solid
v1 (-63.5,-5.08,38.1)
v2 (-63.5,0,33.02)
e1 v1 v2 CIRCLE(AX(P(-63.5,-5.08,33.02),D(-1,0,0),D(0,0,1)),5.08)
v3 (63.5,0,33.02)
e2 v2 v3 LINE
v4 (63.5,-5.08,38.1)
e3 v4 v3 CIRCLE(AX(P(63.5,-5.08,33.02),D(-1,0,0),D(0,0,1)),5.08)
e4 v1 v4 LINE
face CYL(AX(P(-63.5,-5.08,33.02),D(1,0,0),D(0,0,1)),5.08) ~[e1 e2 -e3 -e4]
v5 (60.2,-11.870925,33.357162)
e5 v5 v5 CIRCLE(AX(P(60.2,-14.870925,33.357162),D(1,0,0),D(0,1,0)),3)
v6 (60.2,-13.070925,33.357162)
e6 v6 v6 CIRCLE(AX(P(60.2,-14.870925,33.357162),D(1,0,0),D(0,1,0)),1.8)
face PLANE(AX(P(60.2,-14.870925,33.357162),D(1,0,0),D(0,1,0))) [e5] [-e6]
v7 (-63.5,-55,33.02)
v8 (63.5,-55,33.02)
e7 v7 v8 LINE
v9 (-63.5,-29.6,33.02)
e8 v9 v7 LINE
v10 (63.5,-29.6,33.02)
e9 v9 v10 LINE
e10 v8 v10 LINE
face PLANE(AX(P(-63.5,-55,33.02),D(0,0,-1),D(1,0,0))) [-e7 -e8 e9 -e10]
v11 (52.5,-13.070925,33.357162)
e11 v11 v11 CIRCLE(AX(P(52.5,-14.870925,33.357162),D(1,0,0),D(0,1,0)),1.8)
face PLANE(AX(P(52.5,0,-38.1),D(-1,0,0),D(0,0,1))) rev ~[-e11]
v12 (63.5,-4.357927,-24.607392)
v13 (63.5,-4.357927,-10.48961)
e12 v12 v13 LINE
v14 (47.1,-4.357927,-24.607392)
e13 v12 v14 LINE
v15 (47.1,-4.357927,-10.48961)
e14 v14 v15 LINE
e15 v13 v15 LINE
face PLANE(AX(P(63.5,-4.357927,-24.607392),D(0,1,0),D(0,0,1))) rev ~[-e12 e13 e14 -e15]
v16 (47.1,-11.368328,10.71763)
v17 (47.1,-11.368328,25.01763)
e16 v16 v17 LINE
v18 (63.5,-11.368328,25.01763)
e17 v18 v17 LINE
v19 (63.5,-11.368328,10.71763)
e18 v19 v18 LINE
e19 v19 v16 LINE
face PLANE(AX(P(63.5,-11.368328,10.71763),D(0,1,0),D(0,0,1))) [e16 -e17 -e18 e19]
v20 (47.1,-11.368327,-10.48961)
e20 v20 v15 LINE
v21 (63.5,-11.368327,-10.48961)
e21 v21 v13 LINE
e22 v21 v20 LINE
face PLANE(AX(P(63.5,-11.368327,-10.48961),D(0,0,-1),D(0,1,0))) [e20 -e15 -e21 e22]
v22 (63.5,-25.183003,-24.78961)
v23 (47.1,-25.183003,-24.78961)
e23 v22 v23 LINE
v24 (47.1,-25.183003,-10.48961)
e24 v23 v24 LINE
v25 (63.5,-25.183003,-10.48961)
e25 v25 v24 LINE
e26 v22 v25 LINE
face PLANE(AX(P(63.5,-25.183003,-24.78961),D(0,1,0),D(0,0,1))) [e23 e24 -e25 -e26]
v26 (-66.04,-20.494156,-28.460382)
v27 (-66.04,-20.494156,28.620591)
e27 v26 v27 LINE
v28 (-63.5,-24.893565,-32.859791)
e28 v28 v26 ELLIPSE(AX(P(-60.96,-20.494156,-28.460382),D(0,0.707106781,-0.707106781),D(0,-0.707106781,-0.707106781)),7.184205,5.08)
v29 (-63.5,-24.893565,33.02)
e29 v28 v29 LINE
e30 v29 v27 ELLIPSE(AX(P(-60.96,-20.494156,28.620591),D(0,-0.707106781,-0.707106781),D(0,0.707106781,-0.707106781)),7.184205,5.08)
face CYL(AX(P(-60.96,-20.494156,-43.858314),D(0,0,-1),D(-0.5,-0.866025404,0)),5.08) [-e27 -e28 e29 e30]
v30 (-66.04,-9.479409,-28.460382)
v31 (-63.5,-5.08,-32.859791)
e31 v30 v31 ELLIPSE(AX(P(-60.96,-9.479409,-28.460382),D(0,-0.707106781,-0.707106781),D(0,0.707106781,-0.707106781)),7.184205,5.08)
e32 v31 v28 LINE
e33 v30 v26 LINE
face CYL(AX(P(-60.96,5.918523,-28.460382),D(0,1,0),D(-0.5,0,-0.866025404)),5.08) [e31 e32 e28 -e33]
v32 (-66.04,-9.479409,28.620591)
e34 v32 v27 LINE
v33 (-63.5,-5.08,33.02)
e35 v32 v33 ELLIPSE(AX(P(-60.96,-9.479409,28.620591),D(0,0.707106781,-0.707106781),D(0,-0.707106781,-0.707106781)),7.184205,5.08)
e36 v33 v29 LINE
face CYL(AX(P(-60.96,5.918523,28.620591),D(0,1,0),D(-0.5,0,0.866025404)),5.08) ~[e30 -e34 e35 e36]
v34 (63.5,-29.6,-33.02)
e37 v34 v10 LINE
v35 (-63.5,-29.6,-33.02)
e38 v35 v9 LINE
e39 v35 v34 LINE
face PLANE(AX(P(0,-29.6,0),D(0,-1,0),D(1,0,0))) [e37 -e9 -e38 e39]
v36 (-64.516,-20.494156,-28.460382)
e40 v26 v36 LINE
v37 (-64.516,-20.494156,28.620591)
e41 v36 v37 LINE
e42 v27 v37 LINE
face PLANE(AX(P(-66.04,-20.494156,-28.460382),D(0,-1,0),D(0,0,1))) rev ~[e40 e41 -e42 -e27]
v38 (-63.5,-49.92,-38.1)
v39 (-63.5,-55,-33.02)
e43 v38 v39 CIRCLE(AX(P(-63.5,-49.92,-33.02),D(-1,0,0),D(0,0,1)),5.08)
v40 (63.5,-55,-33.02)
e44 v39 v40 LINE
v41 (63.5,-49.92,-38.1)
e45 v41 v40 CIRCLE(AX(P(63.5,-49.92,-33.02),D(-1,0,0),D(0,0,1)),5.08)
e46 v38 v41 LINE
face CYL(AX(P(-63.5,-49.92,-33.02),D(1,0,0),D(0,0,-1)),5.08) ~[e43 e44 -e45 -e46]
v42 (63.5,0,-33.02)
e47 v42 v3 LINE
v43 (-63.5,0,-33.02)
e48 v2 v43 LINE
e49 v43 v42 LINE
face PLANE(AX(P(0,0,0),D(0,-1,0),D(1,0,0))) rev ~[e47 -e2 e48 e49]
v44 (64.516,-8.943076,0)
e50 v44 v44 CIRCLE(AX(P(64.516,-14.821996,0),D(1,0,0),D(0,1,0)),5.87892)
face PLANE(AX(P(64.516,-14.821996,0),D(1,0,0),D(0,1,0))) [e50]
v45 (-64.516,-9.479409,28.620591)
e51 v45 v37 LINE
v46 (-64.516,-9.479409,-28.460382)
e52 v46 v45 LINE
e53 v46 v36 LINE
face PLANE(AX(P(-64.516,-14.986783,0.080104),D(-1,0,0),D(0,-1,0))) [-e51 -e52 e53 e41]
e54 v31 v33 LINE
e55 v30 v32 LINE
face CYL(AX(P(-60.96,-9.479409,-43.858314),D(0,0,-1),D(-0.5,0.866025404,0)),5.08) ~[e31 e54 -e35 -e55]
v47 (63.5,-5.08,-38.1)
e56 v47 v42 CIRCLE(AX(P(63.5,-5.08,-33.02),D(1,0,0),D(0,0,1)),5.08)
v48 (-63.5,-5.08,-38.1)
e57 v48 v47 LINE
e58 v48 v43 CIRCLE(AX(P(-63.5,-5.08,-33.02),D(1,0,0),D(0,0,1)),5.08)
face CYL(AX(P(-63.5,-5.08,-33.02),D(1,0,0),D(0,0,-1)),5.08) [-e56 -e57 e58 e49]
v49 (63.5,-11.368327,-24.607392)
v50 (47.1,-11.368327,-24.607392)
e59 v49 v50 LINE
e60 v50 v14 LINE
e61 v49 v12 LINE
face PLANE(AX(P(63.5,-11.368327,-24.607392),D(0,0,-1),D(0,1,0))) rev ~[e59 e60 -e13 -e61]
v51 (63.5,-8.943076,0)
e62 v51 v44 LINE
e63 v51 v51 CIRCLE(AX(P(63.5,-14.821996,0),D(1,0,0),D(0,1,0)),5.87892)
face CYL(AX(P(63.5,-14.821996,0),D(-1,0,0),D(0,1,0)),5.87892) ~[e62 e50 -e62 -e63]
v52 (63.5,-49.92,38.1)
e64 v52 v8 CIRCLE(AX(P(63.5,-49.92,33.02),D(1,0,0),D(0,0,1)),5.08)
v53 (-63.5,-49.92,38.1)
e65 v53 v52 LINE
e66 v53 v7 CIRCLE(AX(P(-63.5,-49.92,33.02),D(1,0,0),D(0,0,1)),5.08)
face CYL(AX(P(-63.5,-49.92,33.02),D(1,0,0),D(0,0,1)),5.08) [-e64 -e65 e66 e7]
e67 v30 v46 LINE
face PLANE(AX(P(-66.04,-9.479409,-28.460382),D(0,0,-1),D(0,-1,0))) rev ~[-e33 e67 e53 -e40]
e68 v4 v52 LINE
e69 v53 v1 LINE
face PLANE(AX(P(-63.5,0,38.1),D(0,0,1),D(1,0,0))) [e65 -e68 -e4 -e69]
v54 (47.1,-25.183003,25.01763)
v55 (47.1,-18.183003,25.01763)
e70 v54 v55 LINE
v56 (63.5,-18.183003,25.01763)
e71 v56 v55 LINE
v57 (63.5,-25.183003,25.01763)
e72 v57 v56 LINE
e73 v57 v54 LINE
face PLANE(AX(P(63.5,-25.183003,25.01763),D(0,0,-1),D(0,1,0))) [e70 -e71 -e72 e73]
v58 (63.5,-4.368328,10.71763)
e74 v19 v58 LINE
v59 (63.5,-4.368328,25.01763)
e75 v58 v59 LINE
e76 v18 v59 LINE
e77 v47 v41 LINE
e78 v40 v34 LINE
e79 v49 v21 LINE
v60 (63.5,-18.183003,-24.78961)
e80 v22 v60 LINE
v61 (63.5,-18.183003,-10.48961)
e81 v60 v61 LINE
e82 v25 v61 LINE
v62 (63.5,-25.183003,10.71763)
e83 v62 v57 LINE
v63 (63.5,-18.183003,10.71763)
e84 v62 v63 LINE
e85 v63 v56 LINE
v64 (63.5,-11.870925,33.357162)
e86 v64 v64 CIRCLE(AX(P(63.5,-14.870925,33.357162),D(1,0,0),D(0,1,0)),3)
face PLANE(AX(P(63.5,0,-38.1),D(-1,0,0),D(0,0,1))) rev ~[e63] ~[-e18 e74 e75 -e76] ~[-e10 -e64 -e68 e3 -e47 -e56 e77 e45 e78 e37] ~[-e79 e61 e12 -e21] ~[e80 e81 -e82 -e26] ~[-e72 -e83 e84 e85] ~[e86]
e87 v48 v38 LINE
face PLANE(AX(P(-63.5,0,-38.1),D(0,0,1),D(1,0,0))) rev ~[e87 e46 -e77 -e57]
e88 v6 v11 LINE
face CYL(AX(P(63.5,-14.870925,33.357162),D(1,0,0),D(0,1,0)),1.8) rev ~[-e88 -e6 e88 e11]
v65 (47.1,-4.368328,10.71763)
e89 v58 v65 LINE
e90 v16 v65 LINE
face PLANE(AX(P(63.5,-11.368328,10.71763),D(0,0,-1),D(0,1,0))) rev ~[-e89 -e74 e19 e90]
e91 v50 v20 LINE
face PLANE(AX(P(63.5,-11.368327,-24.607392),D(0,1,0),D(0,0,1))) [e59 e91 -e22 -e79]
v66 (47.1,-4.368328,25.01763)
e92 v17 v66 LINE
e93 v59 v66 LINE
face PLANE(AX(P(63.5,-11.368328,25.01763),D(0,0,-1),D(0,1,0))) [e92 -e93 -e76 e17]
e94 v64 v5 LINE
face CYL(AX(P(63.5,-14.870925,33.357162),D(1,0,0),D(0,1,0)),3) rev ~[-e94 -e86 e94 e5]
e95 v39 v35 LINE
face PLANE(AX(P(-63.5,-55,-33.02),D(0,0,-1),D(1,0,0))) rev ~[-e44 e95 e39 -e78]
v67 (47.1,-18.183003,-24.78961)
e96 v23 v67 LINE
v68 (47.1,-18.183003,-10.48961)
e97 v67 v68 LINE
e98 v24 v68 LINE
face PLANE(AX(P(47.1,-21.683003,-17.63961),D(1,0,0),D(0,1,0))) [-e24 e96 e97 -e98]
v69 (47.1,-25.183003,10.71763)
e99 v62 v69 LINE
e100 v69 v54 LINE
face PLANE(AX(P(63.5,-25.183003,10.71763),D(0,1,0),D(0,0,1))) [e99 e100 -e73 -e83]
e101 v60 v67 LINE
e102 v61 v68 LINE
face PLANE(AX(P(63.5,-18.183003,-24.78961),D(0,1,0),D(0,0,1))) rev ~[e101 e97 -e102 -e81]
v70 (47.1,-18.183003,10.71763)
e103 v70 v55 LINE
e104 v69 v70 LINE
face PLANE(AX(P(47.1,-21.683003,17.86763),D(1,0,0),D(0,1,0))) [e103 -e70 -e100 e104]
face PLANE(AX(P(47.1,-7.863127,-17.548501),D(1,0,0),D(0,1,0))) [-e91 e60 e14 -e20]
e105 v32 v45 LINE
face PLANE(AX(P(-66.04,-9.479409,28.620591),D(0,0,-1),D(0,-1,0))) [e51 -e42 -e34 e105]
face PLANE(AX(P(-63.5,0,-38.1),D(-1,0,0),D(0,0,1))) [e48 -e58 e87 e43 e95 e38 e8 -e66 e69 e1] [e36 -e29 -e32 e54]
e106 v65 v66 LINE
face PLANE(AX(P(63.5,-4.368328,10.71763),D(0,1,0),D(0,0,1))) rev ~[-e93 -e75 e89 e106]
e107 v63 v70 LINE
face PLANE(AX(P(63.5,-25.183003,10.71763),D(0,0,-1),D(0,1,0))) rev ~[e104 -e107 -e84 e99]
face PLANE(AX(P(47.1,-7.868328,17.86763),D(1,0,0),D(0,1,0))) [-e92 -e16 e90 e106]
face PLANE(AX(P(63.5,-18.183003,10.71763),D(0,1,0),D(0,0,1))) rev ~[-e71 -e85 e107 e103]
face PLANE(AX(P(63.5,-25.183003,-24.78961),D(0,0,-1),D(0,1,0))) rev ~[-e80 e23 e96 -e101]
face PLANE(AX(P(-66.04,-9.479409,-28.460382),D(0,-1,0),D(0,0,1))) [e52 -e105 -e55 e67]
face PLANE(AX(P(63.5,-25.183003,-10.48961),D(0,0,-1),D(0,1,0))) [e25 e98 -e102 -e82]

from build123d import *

# Parameters (mm, degrees)
F0_W         = 127
F0_H         = 76.2
F1_DEPTH     = 55
F2_R         = 5.08
F3_W         = 7
F3_H         = 14.3
F4_DEPTH     = 16.4
F5_DEPTH     = 25.4
F6_W         = 7
F6_H         = 14.3
F6_W_2       = 7.0104
F6_H_2       = 14.117781591
F7_DEPTH     = 16.4
F9_W         = 19.8135651034
F9_H         = 65.8797910702
F10_DEPTH    = 2.54
F11_T1_DEPTH = 87.8768363263
F11_T3_DEPTH = 41.8106103595
F12_DEPTH    = 1.524
F13_R        = 3
F13_R_2      = 1.8
F14_DEPTH    = 3.3
F15_DEPTH    = 11
F8_R         = 5.878920021
F16_DEPTH    = 1.016


# Not quite as in the source:
# - a fillet or chamfer that OpenCascade refuses, or shapes differently, is made with other operations: its cross-section is extruded or revolved along the edge and cut away or added


with BuildPart() as f1:
    # F0 (on Front) → F1 (new body)
    with BuildSketch(Plane.XZ):
        Rectangle(F0_W, F0_H)
    extrude(amount=F1_DEPTH)

    # F2
    f2_edges = [f1.edges().sort_by_distance(p)[0] for p in [
        (0, -55, -38.1),
        (0, 0, -38.1),
        (0, -55, 38.1),
        (0, 0, 38.1),
    ]]
    fillet(f2_edges, radius=F2_R)

    # F3 (on face) → F4 (cut)
    with BuildSketch(Plane.YZ.offset(63.5)):
        with Locations((-49.3123565018, 17.8676303864)):
            Rectangle(F3_W, F3_H)
        with Locations((-35.2098751962, 17.8676303864)):
            Rectangle(F3_W, F3_H)
        with Locations((-21.6830033958, 17.8676303864)):
            Rectangle(F3_W, F3_H)
        with Locations((-7.8683277741, 17.8676303864)):
            Rectangle(F3_W, F3_H)
    extrude(amount=-F4_DEPTH, mode=Mode.SUBTRACT)

    # F5 (cut): a face of the model
    f5_faces = [f1.faces().sort_by_distance(p)[0] for p in [
        (0, -55, 0),
    ]]
    extrude(f5_faces, amount=-F5_DEPTH, mode=Mode.SUBTRACT)

    # F6 (on face) → F7 (cut)
    with BuildSketch(Plane.YZ.offset(63.5)):
        with Locations((-21.6830033958, -17.639610437)):
            Rectangle(F6_W, F6_H)
        with Locations((-7.8631268428, -17.5485012325)):
            Rectangle(F6_W_2, F6_H_2)
    extrude(amount=-F7_DEPTH, mode=Mode.SUBTRACT)

    # F9 (on face) → F10 (join)
    with BuildSketch(Plane(origin=(-63.5, 0, 0), x_dir=(0, -1, 0), z_dir=(-1, 0, 0))):
        with Locations((14.9867825517, 0.0801044649)):
            Rectangle(F9_W, F9_H)
    extrude(amount=F10_DEPTH)

    # F11: fillet of radius 5.08 on 4 edges, made by hand

    # F11_s2 → F11_t1 (cut)
    with BuildSketch(Plane.XY.offset(-43.8583136983)):
        with BuildLine():
            ThreePointArc((-63.5, -24.8935651034), (-65.3594090512, -23.0341560522), (-66.04, -20.4941560522))
            Line((-66.04, -20.4941560522), (-66.04, -24.8935651034))
            Line((-66.04, -24.8935651034), (-63.5, -24.8935651034))
        make_face()
        with BuildLine():
            ThreePointArc((-63.5, -5.08), (-65.3594090512, -6.9394090512), (-66.04, -9.4794090512))
            Line((-66.04, -9.4794090512), (-66.04, -5.08))
            Line((-66.04, -5.08), (-63.5, -5.08))
        make_face()
    extrude(amount=F11_T1_DEPTH, mode=Mode.SUBTRACT)

    # F11_s4 → F11_t3 (cut)
    with BuildSketch(Plane.XZ.offset(-5.9185226281)):
        with BuildLine():
            ThreePointArc((-63.5, 33.02), (-65.3594090512, 31.1605909488), (-66.04, 28.6205909488))
            Line((-66.04, 28.6205909488), (-66.04, 33.02))
            Line((-66.04, 33.02), (-63.5, 33.02))
        make_face()
        with BuildLine():
            ThreePointArc((-63.5, -32.8597910702), (-65.3594090512, -31.000382019), (-66.04, -28.460382019))
            Line((-66.04, -28.460382019), (-66.04, -32.8597910702))
            Line((-66.04, -32.8597910702), (-63.5, -32.8597910702))
        make_face()
    extrude(amount=F11_T3_DEPTH, mode=Mode.SUBTRACT)

    # F12 (cut): a face of the model
    f12_faces = [f1.faces().sort_by_distance(p)[0] for p in [
        (-66.04, -14.9867825517, 0.0801044649),
    ]]
    extrude(f12_faces, amount=-F12_DEPTH, mode=Mode.SUBTRACT)

    # F13 (on face) → F14 (cut)
    with BuildSketch(Plane.YZ.offset(63.5)):
        with Locations((-14.8709248751, 33.3571620286)):
            Circle(F13_R)
        with Locations((-14.8709248751, 33.3571620286)):
            Circle(F13_R_2, mode=Mode.SUBTRACT)
    extrude(amount=-F14_DEPTH, mode=Mode.SUBTRACT)

    # F15 (cut): a face of the model
    f15_faces = [f1.faces().sort_by_distance(p)[0] for p in [
        (63.5, -14.8709248751, 33.3571620286),
    ]]
    extrude(f15_faces, amount=-F15_DEPTH, mode=Mode.SUBTRACT)

    # F8 (on face) → F16 (join)
    with BuildSketch(Plane.YZ.offset(63.5)):
        with Locations((-14.821995981, 0)):
            Circle(F8_R)
    extrude(amount=F16_DEPTH)


solid = f1.part
